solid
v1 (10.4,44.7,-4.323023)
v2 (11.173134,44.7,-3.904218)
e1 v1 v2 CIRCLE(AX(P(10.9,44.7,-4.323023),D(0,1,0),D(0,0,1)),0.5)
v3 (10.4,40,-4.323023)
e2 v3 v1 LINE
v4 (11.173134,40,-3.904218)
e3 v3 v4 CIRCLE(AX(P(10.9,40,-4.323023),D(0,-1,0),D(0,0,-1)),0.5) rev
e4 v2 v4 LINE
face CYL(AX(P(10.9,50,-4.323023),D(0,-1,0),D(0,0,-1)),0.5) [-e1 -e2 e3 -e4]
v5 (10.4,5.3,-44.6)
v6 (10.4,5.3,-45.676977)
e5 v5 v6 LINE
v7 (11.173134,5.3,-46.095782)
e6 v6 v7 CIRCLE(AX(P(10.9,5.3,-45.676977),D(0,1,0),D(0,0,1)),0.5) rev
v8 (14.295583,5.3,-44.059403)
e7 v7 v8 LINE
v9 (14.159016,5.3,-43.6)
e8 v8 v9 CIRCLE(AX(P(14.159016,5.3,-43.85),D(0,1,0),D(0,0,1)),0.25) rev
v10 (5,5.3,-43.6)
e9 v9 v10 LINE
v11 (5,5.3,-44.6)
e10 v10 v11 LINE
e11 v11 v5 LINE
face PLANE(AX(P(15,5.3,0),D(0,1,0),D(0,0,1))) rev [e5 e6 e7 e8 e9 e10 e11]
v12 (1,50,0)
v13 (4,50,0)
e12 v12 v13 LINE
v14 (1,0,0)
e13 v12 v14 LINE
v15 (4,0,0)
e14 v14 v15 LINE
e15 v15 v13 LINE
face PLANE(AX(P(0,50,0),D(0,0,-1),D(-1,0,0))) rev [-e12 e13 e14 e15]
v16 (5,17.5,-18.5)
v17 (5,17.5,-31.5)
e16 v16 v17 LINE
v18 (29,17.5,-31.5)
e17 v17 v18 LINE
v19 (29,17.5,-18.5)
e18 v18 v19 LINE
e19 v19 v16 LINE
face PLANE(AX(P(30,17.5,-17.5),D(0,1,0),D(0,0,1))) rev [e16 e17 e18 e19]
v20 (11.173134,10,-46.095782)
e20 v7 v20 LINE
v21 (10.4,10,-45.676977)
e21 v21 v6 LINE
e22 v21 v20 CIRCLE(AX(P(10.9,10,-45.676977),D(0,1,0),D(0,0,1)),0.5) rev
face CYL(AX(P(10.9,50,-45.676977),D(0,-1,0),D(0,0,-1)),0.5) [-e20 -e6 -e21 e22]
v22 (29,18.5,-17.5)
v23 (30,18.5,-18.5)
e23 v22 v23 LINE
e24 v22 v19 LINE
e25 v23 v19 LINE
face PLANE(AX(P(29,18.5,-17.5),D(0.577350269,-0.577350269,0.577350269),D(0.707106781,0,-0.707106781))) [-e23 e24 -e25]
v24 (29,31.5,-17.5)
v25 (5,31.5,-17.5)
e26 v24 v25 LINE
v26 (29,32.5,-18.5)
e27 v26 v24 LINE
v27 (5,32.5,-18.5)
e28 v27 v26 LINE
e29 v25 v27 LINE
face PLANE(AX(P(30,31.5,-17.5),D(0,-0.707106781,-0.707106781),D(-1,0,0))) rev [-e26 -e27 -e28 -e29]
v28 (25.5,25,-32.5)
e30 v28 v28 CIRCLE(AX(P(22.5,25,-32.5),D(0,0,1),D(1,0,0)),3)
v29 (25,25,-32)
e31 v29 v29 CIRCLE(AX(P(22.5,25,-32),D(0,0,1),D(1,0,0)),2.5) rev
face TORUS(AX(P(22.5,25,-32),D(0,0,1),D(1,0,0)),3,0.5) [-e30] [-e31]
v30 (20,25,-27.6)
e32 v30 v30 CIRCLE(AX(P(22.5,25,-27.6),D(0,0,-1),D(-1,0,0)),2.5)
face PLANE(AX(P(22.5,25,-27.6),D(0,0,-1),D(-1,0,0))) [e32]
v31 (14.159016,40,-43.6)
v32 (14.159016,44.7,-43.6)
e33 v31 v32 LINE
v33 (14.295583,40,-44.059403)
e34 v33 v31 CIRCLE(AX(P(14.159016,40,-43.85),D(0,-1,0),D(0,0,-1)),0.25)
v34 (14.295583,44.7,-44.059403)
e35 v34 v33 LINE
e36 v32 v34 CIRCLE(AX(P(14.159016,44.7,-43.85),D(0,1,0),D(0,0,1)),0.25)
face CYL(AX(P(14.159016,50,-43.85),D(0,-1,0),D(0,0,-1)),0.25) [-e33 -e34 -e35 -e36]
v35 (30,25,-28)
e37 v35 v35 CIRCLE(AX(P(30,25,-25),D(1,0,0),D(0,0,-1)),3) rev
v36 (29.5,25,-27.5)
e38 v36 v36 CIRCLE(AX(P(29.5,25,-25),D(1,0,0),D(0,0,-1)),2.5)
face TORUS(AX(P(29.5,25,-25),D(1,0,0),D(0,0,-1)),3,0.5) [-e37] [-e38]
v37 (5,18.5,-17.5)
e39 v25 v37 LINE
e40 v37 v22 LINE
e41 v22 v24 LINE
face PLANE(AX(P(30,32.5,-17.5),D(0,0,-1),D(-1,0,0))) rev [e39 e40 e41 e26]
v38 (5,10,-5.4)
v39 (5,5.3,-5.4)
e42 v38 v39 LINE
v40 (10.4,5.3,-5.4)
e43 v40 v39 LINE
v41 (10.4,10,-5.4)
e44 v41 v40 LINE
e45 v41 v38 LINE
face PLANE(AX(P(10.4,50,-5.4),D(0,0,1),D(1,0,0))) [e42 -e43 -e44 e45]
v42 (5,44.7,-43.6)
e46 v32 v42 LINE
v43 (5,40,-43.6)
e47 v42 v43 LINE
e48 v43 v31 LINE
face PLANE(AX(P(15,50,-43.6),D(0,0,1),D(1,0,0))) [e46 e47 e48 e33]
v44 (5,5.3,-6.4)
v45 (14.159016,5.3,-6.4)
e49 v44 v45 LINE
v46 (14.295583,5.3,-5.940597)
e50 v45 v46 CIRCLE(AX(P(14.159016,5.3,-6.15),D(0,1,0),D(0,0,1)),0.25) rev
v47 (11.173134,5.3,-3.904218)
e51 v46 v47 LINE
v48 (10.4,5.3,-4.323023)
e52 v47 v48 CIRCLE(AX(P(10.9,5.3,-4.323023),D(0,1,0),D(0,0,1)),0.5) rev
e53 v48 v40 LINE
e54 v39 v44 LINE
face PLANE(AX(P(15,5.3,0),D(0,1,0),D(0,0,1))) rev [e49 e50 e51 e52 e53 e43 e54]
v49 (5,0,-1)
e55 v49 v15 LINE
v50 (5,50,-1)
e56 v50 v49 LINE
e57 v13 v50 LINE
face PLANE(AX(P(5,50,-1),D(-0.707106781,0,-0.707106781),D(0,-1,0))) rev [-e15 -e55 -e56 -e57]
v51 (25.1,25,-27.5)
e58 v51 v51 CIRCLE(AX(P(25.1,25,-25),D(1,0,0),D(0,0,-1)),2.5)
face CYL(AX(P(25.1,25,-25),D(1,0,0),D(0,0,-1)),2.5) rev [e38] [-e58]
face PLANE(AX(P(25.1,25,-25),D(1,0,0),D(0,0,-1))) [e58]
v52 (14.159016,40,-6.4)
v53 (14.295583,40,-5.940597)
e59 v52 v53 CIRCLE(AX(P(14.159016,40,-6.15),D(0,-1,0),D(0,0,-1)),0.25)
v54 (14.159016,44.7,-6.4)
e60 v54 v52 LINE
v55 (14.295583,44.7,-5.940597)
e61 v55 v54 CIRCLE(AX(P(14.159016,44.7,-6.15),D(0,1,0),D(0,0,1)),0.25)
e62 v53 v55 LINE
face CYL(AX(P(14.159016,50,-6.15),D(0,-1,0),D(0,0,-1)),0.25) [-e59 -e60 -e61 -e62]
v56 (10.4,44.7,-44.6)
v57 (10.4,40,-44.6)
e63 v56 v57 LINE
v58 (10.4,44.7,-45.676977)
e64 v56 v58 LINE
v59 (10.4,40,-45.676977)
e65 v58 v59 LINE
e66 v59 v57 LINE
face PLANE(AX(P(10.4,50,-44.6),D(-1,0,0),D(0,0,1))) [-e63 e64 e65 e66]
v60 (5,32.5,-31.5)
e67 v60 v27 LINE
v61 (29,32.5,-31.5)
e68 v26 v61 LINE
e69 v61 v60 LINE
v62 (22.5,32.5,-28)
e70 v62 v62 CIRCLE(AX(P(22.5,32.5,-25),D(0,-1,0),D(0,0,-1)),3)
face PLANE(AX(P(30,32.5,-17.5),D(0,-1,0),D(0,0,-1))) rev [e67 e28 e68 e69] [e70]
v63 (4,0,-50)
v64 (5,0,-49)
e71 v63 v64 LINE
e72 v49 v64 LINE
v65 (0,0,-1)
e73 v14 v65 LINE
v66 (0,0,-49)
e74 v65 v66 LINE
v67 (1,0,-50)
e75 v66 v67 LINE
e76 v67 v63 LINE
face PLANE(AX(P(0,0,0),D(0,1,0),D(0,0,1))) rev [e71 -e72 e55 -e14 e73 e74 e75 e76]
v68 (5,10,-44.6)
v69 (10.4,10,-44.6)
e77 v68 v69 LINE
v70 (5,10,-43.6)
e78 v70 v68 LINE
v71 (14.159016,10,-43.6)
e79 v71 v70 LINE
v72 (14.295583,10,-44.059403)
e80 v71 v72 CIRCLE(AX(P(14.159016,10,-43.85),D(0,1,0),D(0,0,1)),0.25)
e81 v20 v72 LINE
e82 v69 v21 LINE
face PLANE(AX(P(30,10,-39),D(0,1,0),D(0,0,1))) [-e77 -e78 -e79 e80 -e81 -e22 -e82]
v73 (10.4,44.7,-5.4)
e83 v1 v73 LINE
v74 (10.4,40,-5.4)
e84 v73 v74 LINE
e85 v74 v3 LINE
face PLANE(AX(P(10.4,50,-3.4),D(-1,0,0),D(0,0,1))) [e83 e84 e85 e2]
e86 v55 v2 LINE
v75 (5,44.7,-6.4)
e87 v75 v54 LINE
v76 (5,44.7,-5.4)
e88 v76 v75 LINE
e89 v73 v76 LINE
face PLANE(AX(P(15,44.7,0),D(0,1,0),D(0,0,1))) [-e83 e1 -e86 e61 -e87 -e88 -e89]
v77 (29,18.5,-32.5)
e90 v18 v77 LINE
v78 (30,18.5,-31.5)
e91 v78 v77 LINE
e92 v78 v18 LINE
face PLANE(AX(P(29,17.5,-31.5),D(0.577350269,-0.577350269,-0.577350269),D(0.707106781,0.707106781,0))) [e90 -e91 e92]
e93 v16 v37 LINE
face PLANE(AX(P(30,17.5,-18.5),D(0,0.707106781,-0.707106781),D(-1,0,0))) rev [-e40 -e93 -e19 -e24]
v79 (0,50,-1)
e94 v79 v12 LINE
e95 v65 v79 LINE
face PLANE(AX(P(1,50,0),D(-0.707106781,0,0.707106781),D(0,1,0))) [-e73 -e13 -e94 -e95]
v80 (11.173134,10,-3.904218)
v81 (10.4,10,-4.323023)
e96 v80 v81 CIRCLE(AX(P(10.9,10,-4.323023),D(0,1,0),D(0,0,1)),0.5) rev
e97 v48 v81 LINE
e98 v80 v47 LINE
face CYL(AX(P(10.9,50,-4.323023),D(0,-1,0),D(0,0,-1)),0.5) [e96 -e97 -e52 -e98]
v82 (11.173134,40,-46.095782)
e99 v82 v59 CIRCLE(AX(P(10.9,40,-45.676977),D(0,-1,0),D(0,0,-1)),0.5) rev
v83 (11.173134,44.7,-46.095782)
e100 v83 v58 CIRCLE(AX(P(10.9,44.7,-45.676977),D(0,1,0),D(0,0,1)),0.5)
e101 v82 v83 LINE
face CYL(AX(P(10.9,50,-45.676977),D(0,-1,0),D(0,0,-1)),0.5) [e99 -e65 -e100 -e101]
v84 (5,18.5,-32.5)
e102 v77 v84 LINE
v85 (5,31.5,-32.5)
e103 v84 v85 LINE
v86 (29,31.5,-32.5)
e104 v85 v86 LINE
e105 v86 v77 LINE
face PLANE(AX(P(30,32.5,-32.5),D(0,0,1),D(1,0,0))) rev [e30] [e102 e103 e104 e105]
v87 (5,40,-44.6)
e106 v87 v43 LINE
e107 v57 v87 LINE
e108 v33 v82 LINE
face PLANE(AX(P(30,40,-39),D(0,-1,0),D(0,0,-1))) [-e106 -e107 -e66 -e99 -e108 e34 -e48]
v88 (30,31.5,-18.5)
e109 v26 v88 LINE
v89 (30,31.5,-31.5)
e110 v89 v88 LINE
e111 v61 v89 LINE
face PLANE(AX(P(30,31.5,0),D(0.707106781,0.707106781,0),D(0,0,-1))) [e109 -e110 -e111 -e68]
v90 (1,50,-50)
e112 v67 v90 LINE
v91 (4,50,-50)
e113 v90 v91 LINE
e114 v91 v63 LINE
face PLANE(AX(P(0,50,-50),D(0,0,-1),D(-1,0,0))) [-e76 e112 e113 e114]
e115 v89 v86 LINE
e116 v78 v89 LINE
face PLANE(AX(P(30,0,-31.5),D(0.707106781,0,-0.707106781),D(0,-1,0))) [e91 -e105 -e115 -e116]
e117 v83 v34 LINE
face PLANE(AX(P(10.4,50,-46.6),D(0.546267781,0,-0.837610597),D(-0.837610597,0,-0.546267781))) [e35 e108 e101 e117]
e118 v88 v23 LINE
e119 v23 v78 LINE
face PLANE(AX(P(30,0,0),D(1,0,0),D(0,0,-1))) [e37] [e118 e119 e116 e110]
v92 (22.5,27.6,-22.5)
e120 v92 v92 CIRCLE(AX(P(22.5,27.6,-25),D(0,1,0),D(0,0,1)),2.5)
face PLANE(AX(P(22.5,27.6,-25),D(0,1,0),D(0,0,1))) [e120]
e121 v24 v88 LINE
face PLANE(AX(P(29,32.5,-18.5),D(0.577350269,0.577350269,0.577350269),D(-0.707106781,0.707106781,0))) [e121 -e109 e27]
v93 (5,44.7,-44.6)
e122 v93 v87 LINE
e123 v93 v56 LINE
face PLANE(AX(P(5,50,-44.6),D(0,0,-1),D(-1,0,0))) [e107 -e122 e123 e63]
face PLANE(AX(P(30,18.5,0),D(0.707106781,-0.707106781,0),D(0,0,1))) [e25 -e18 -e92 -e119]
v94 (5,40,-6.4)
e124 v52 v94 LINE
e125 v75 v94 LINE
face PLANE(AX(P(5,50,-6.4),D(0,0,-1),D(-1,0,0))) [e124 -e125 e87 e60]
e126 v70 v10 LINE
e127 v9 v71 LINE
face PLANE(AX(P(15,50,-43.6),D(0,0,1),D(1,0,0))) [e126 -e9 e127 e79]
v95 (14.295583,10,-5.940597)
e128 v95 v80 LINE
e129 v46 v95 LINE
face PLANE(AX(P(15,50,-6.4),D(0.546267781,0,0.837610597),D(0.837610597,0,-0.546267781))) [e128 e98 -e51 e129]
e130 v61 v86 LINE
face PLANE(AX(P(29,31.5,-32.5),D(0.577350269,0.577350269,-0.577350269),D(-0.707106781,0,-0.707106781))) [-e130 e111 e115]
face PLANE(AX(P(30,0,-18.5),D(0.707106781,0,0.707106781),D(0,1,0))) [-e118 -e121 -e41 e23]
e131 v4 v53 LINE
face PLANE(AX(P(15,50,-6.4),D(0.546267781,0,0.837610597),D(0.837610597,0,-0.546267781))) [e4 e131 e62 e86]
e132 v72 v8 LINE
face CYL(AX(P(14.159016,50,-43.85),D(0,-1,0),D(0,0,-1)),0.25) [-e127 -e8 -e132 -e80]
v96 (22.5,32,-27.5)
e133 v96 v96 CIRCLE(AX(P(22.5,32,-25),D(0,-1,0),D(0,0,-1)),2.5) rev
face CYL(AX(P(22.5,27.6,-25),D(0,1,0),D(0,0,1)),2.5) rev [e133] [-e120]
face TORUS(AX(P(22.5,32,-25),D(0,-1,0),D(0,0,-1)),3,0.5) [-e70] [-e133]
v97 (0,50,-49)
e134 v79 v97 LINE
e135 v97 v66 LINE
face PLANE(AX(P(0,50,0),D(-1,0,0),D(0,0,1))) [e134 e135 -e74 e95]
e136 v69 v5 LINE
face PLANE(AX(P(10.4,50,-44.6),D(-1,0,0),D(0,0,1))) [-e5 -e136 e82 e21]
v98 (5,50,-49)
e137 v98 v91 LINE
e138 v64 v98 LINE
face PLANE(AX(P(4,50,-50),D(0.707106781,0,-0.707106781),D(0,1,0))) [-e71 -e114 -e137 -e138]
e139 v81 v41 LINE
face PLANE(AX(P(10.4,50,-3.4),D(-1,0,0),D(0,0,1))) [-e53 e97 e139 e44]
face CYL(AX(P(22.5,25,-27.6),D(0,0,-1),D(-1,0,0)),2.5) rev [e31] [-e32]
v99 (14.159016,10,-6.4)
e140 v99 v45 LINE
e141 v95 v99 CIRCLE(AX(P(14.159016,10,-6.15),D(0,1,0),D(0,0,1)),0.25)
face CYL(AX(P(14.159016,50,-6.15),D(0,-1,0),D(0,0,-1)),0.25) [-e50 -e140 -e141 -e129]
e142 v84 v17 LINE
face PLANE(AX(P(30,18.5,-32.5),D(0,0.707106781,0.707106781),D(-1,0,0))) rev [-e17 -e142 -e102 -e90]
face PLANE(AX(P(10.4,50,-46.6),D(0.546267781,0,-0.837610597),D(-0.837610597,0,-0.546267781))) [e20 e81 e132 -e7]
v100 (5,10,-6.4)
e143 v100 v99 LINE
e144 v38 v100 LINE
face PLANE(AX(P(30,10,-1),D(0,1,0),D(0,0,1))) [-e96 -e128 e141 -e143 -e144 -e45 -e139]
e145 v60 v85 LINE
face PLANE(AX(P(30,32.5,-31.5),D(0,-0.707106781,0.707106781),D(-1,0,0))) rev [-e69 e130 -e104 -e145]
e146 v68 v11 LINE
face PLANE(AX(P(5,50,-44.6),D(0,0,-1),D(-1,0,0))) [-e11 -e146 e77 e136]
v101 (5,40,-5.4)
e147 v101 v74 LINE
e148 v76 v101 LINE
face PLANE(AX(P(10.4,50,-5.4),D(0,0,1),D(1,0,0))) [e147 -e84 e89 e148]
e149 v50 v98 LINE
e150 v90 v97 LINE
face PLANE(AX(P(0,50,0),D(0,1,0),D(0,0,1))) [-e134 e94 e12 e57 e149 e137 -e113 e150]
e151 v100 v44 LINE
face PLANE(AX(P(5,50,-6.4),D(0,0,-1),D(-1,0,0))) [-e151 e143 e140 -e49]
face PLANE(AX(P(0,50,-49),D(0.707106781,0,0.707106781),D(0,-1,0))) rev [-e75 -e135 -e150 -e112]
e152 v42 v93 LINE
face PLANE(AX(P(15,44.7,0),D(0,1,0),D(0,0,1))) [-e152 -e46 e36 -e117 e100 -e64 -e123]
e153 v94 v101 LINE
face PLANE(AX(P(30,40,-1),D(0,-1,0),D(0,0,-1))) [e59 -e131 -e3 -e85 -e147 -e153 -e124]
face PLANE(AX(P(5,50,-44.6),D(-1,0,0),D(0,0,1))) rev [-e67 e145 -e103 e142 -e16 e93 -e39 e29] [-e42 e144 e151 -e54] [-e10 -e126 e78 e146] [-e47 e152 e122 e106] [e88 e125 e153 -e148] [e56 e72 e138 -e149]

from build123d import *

# Parameters (mm, degrees)
BOSS_EXTRUDE2_DEPTH = 50
SKETCH17_W          = 50
SKETCH17_H          = 5.3
CUT_EXTRUDE5_DEPTH  = 72.414284285
FILLET2_R           = 0.5
SKETCH33_W          = 15
SKETCH33_H          = 15
BOSS_EXTRUDE4_DEPTH = 25
SKETCH34_R          = 2.5
CUT_EXTRUDE13_DEPTH = 4.9
SKETCH37_R          = 2.5
CUT_EXTRUDE14_DEPTH = 4.9
SKETCH38_R          = 2.5
CUT_EXTRUDE15_DEPTH = 4.9
CHAMFER2_SIZE       = 1
FILLET3_R           = 0.5
CHAMFER3_SIZE       = 1
SKETCH40_W          = 10
SKETCH40_H          = 30
CUT_EXTRUDE17_DEPTH = 76
FILLET4_R           = 0.25


with BuildPart() as part:
    # Sketch3 → Boss-Extrude2 (new body)
    with BuildSketch(Plane(origin=(0, 0, 0), x_dir=(1, 0, 0), z_dir=(0, 1, 0))):
        Polygon((5, 44.6), (10.4, 44.6), (10.4, 46.6), (15, 43.6), (5, 43.6), (5, 6.4), (15, 6.4), (10.4, 3.4), (10.4, 5.4), (5, 5.4), (5, 0), (0, 0), (0, 50), (5, 50), align=None)
    extrude(amount=BOSS_EXTRUDE2_DEPTH)

    # Sketch17 → Cut-Extrude5 (cut, through all)
    with BuildSketch(Plane(origin=(5, 0, 0), x_dir=(0, 0, -1), z_dir=(1, 0, 0))):
        with Locations((25, 2.65)):
            Rectangle(SKETCH17_W, SKETCH17_H)
        with Locations((25, 47.35)):
            Rectangle(SKETCH17_W, SKETCH17_H)
    extrude(amount=CUT_EXTRUDE5_DEPTH, mode=Mode.SUBTRACT)

    # Fillet2
    fillet2_edges = [part.edges().sort_by_distance(p)[0] for p in [
        (10.4, 25, -46.6),
        (10.4, 25, -3.4),
    ]]
    fillet(fillet2_edges, radius=FILLET2_R)

    # Sketch33 → Boss-Extrude4 (add)
    with BuildSketch(Plane(origin=(5, 0, 0), x_dir=(0, 0, -1), z_dir=(1, 0, 0))):
        with Locations((25, 25)):
            Rectangle(SKETCH33_W, SKETCH33_H)
    extrude(amount=BOSS_EXTRUDE4_DEPTH)

    # Sketch34 → Cut-Extrude13 (cut)
    with BuildSketch(Plane(origin=(0, 32.5, 0), x_dir=(1, 0, 0), z_dir=(0, 1, 0))):
        with Locations((22.5, 25)):
            Circle(SKETCH34_R)
    extrude(amount=-CUT_EXTRUDE13_DEPTH, mode=Mode.SUBTRACT)

    # Sketch37 → Cut-Extrude14 (cut)
    with BuildSketch(Plane(origin=(30, 0, 0), x_dir=(0, 0, -1), z_dir=(1, 0, 0))):
        with Locations((25, 25)):
            Circle(SKETCH37_R)
    extrude(amount=-CUT_EXTRUDE14_DEPTH, mode=Mode.SUBTRACT)

    # Sketch38 → Cut-Extrude15 (cut)
    with BuildSketch(Plane(origin=(0, 0, -32.5), x_dir=(-1, 0, 0), z_dir=(0, 0, -1))):
        with Locations((-22.5, 25)):
            Circle(SKETCH38_R)
    extrude(amount=-CUT_EXTRUDE15_DEPTH, mode=Mode.SUBTRACT)

    # Chamfer2
    chamfer2_edges = [part.edges().sort_by_distance(p)[0] for p in [
        (17.5, 32.5, -32.5),
        (17.5, 17.5, -32.5),
        (17.5, 17.5, -17.5),
        (17.5, 32.5, -17.5),
        (30, 17.5, -25),
        (30, 25, -32.5),
        (30, 32.5, -25),
        (30, 25, -17.5),
    ]]
    chamfer(chamfer2_edges, length=CHAMFER2_SIZE)

    # Fillet3
    fillet3_edges = [part.edges().sort_by_distance(p)[0] for p in [
        (20, 32.5, -25),
        (30, 25, -22.5),
        (25, 25, -32.5),
    ]]
    fillet(fillet3_edges, radius=FILLET3_R)

    # Chamfer3
    chamfer3_edges = [part.edges().sort_by_distance(p)[0] for p in [
        (5, 25, 0),
        (0, 25, 0),
        (5, 25, -50),
        (0, 25, -50),
    ]]
    chamfer(chamfer3_edges, length=CHAMFER3_SIZE)

    # Sketch40 → Cut-Extrude17 (cut, through all)
    with BuildSketch(Plane(origin=(5, 0, 0), x_dir=(0, 0, -1), z_dir=(1, 0, 0))):
        with Locations((6, 25)):
            Rectangle(SKETCH40_W, SKETCH40_H)
        with Locations((44, 25)):
            Rectangle(SKETCH40_W, SKETCH40_H)
    extrude(amount=CUT_EXTRUDE17_DEPTH, mode=Mode.SUBTRACT)

    # Fillet4
    fillet4_edges = [part.edges().sort_by_distance(p)[0] for p in [
        (15, 42.35, -43.6),
        (15, 42.35, -6.4),
        (15, 7.65, -6.4),
        (15, 7.65, -43.6),
    ]]
    fillet(fillet4_edges, radius=FILLET4_R)


solid = part.part
